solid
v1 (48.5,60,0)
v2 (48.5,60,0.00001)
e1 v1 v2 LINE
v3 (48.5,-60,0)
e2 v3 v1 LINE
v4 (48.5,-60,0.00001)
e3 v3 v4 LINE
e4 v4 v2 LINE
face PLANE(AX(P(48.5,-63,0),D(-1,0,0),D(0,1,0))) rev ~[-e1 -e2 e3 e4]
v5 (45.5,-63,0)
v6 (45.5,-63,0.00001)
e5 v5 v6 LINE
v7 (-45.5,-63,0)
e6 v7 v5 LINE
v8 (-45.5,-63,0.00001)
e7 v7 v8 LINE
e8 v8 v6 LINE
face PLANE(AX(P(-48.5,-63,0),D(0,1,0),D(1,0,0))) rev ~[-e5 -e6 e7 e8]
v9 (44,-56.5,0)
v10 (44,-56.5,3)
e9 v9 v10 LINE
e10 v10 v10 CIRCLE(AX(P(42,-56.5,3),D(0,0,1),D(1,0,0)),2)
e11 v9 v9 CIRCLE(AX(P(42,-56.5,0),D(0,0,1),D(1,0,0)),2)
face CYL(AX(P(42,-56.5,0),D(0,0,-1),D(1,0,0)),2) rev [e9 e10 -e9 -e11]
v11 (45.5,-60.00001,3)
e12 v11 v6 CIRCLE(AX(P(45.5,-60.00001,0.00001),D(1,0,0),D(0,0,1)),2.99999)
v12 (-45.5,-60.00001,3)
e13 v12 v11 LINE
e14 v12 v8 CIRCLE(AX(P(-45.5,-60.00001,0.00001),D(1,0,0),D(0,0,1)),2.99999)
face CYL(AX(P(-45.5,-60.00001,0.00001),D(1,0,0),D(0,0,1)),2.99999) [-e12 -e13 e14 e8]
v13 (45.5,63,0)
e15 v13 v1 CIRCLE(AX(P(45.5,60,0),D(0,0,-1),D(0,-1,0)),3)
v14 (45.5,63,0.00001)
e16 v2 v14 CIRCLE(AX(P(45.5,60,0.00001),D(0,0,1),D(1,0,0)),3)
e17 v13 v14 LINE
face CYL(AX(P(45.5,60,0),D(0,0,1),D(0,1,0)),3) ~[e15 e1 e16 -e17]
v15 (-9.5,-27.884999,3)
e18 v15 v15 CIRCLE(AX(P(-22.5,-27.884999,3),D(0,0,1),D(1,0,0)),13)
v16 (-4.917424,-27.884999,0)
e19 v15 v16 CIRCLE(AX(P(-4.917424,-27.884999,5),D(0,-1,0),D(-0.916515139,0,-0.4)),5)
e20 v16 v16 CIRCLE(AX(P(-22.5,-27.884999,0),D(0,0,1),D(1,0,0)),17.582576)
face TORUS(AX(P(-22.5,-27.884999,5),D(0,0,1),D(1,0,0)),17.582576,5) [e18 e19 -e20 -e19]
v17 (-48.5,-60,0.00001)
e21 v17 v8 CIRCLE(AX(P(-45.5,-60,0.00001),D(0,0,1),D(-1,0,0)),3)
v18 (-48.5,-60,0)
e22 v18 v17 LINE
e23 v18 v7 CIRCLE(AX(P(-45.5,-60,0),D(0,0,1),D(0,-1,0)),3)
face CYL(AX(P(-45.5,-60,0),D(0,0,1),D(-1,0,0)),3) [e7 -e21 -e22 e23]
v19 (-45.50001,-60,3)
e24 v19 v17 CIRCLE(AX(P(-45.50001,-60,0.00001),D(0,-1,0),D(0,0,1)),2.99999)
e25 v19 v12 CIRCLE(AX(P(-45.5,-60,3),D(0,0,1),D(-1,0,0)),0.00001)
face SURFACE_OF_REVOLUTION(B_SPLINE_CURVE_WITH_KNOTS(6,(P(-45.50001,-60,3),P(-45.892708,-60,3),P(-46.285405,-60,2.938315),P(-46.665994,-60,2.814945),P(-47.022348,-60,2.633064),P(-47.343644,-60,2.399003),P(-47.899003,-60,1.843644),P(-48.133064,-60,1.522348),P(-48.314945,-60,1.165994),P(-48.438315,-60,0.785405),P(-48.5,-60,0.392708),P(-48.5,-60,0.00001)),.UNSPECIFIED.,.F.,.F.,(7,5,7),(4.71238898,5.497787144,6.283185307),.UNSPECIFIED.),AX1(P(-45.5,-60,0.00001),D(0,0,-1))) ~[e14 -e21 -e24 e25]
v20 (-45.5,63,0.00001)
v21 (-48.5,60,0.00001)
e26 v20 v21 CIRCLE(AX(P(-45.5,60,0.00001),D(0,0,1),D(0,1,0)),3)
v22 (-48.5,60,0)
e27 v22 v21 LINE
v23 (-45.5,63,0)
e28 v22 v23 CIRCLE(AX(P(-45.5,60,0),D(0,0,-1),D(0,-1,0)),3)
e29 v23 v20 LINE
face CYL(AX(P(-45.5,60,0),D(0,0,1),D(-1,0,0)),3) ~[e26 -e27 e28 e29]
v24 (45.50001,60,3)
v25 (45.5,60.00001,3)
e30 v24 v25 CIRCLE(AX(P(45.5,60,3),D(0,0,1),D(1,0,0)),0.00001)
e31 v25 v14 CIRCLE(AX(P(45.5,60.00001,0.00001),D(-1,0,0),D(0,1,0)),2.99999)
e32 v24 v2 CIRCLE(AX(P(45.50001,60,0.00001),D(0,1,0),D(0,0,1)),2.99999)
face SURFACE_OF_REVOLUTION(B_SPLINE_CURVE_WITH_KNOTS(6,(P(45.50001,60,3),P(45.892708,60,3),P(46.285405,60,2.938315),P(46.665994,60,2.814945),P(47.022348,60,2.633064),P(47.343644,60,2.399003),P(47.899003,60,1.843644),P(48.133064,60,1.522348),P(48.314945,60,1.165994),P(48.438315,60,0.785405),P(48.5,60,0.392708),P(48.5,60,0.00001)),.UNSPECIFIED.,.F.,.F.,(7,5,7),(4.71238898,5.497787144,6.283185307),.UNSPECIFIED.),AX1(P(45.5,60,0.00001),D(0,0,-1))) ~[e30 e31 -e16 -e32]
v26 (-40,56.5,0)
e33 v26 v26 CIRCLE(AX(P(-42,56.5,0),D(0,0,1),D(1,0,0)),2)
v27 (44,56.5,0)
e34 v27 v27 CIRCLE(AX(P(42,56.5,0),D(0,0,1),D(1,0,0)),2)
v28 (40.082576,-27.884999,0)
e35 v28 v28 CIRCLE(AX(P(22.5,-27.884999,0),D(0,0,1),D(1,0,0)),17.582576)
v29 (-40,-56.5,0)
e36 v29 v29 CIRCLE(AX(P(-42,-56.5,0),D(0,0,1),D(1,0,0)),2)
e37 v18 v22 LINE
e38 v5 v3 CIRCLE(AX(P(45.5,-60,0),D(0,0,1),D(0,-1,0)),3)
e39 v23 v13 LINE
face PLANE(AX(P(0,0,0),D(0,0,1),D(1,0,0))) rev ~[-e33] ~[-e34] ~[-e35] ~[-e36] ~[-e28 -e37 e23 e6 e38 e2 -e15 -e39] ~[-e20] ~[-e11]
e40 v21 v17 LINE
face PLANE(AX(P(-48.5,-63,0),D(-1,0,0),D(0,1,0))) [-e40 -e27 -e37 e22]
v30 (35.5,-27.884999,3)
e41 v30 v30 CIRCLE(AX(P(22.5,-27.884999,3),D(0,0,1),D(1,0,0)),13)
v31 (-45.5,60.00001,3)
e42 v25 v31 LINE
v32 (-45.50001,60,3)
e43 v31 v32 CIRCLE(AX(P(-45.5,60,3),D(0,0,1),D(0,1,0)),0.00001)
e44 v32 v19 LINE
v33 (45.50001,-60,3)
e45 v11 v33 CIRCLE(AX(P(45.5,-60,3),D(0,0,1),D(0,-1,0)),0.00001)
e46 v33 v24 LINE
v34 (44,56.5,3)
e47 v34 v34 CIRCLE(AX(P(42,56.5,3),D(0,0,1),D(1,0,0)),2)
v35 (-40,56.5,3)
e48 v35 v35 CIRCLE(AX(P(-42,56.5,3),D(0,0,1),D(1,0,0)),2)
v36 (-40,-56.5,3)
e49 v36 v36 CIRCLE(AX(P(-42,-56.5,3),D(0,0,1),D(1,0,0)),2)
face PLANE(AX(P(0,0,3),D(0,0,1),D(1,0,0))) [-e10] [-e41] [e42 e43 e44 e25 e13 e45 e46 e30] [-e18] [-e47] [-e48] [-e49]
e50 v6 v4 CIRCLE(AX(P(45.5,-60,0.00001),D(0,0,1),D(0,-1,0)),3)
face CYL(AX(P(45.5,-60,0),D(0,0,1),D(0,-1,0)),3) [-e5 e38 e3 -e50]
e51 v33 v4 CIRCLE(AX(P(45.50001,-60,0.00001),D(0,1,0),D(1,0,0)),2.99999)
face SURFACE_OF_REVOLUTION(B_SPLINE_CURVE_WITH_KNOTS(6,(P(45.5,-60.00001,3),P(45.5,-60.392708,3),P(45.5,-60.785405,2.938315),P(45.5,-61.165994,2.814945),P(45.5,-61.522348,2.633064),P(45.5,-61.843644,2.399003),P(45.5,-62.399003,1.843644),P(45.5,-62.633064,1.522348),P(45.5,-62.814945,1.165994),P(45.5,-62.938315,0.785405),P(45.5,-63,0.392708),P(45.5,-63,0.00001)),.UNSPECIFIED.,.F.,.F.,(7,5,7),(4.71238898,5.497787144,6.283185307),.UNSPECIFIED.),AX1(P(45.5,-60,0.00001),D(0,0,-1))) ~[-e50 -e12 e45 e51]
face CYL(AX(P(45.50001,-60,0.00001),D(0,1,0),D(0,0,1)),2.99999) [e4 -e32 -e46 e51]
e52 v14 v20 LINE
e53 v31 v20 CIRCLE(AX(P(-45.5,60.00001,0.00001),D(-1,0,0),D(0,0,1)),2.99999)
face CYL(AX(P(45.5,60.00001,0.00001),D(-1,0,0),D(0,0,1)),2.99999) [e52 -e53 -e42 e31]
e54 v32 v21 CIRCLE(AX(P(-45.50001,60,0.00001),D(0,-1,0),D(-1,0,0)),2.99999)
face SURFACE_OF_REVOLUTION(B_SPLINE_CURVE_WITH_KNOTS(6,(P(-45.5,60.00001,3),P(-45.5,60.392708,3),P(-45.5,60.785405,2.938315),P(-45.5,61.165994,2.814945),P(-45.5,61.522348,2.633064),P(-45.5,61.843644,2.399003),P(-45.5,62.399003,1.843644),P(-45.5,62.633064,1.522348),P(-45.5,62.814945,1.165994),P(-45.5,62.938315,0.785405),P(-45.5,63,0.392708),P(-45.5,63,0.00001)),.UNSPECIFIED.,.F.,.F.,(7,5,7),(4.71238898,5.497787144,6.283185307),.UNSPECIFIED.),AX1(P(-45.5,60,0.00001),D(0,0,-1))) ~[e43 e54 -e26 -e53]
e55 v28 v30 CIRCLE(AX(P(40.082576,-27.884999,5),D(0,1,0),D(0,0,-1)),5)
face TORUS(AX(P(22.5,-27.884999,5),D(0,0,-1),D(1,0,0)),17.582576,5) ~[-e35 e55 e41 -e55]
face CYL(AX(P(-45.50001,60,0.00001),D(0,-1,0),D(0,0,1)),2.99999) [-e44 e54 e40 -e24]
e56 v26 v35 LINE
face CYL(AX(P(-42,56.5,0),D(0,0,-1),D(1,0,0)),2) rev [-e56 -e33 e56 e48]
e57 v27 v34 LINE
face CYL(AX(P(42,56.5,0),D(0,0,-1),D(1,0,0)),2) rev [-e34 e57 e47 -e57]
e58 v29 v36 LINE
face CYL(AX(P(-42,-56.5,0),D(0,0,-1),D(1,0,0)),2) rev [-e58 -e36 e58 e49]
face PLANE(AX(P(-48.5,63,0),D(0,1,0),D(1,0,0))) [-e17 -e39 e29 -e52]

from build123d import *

# Parameters (mm, degrees)
F0_W     = 97
F0_H     = 126
F0_R     = 2
F0_R_2   = 13
F1_DEPTH = 3
F4_R     = 3
F5_R     = 3
F6_R     = 2.99999


# Not quite as in the source:
# - a fillet or chamfer that OpenCascade refuses, or shapes differently, is made with other operations: its cross-section is extruded or revolved along the edge and cut away or added
# - a fillet or chamfer is up to 0.001 mm smaller than in the source, because OpenCascade refuses the exact size


with BuildPart() as f1:
    # F0 (on Top) → F1 (new body)
    with BuildSketch(Plane.XY):
        Rectangle(F0_W, F0_H)
        with Locations((-42, -56.5)):
            Circle(F0_R, mode=Mode.SUBTRACT)
        with Locations((-22.5, -27.884999302)):
            Circle(F0_R_2, mode=Mode.SUBTRACT)
        with Locations((42, -56.5)):
            Circle(F0_R, mode=Mode.SUBTRACT)
        with Locations((22.5, -27.8849992901)):
            Circle(F0_R_2, mode=Mode.SUBTRACT)
        with Locations((-42, 56.5)):
            Circle(F0_R, mode=Mode.SUBTRACT)
        with Locations((42, 56.5)):
            Circle(F0_R, mode=Mode.SUBTRACT)
    extrude(amount=F1_DEPTH)

    # F2: fillet of radius 5 on 1 edges, made by hand

    # F2_s1 → F2_t2 (revolve, cut)
    with BuildSketch(Plane.XZ.offset(27.884999302)):
        with BuildLine():
            ThreePointArc((-9.5, 3), (-7.6560370926, 0.8166998673), (-4.917424305, 0))
            Line((-4.917424305, 0), (-9.5, 0))
            Line((-9.5, 0), (-9.5, 3))
        make_face()
    revolve(axis=Axis((-22.5, -27.884999302, 0), (0, 0, 1)), mode=Mode.SUBTRACT)

    # F3: fillet of radius 5 on 1 edges, made by hand

    # F3_s1 → F3_t2 (revolve, cut)
    with BuildSketch(Plane.XZ.offset(27.8849992901)):
        with BuildLine():
            ThreePointArc((40.082575695, 0), (37.3439629074, 0.8166998673), (35.5, 3))
            Line((35.5, 3), (35.5, 0))
            Line((35.5, 0), (40.082575695, 0))
        make_face()
    revolve(axis=Axis((22.5, -27.8849992901, 0), (0, 0, 1)), mode=Mode.SUBTRACT)

    # F4
    f4_edges = [f1.edges().sort_by_distance(p)[0] for p in [
        (48.5, -63, 1.5),
        (-48.5, -63, 1.5),
    ]]
    fillet(f4_edges, radius=F4_R)

    # F5
    f5_edges = [f1.edges().sort_by_distance(p)[0] for p in [
        (48.5, 63, 1.5),
        (-48.5, 63, 1.5),
    ]]
    fillet(f5_edges, radius=F5_R)

    # F6 (radius 3 in the source; OpenCascade refuses exactly that, so slightly less here)
    f6_edges = [f1.edges().sort_by_distance(p)[0] for p in [
        (0, -63, 3),
        (47.62132, -62.12132, 3),
        (48.5, 0, 3),
        (47.62132, 62.12132, 3),
        (0, 63, 3),
        (-47.62132, 62.12132, 3),
        (-48.5, 0, 3),
        (-47.62132, -62.12132, 3),
    ]]
    fillet(f6_edges, radius=F6_R)


solid = f1.part
